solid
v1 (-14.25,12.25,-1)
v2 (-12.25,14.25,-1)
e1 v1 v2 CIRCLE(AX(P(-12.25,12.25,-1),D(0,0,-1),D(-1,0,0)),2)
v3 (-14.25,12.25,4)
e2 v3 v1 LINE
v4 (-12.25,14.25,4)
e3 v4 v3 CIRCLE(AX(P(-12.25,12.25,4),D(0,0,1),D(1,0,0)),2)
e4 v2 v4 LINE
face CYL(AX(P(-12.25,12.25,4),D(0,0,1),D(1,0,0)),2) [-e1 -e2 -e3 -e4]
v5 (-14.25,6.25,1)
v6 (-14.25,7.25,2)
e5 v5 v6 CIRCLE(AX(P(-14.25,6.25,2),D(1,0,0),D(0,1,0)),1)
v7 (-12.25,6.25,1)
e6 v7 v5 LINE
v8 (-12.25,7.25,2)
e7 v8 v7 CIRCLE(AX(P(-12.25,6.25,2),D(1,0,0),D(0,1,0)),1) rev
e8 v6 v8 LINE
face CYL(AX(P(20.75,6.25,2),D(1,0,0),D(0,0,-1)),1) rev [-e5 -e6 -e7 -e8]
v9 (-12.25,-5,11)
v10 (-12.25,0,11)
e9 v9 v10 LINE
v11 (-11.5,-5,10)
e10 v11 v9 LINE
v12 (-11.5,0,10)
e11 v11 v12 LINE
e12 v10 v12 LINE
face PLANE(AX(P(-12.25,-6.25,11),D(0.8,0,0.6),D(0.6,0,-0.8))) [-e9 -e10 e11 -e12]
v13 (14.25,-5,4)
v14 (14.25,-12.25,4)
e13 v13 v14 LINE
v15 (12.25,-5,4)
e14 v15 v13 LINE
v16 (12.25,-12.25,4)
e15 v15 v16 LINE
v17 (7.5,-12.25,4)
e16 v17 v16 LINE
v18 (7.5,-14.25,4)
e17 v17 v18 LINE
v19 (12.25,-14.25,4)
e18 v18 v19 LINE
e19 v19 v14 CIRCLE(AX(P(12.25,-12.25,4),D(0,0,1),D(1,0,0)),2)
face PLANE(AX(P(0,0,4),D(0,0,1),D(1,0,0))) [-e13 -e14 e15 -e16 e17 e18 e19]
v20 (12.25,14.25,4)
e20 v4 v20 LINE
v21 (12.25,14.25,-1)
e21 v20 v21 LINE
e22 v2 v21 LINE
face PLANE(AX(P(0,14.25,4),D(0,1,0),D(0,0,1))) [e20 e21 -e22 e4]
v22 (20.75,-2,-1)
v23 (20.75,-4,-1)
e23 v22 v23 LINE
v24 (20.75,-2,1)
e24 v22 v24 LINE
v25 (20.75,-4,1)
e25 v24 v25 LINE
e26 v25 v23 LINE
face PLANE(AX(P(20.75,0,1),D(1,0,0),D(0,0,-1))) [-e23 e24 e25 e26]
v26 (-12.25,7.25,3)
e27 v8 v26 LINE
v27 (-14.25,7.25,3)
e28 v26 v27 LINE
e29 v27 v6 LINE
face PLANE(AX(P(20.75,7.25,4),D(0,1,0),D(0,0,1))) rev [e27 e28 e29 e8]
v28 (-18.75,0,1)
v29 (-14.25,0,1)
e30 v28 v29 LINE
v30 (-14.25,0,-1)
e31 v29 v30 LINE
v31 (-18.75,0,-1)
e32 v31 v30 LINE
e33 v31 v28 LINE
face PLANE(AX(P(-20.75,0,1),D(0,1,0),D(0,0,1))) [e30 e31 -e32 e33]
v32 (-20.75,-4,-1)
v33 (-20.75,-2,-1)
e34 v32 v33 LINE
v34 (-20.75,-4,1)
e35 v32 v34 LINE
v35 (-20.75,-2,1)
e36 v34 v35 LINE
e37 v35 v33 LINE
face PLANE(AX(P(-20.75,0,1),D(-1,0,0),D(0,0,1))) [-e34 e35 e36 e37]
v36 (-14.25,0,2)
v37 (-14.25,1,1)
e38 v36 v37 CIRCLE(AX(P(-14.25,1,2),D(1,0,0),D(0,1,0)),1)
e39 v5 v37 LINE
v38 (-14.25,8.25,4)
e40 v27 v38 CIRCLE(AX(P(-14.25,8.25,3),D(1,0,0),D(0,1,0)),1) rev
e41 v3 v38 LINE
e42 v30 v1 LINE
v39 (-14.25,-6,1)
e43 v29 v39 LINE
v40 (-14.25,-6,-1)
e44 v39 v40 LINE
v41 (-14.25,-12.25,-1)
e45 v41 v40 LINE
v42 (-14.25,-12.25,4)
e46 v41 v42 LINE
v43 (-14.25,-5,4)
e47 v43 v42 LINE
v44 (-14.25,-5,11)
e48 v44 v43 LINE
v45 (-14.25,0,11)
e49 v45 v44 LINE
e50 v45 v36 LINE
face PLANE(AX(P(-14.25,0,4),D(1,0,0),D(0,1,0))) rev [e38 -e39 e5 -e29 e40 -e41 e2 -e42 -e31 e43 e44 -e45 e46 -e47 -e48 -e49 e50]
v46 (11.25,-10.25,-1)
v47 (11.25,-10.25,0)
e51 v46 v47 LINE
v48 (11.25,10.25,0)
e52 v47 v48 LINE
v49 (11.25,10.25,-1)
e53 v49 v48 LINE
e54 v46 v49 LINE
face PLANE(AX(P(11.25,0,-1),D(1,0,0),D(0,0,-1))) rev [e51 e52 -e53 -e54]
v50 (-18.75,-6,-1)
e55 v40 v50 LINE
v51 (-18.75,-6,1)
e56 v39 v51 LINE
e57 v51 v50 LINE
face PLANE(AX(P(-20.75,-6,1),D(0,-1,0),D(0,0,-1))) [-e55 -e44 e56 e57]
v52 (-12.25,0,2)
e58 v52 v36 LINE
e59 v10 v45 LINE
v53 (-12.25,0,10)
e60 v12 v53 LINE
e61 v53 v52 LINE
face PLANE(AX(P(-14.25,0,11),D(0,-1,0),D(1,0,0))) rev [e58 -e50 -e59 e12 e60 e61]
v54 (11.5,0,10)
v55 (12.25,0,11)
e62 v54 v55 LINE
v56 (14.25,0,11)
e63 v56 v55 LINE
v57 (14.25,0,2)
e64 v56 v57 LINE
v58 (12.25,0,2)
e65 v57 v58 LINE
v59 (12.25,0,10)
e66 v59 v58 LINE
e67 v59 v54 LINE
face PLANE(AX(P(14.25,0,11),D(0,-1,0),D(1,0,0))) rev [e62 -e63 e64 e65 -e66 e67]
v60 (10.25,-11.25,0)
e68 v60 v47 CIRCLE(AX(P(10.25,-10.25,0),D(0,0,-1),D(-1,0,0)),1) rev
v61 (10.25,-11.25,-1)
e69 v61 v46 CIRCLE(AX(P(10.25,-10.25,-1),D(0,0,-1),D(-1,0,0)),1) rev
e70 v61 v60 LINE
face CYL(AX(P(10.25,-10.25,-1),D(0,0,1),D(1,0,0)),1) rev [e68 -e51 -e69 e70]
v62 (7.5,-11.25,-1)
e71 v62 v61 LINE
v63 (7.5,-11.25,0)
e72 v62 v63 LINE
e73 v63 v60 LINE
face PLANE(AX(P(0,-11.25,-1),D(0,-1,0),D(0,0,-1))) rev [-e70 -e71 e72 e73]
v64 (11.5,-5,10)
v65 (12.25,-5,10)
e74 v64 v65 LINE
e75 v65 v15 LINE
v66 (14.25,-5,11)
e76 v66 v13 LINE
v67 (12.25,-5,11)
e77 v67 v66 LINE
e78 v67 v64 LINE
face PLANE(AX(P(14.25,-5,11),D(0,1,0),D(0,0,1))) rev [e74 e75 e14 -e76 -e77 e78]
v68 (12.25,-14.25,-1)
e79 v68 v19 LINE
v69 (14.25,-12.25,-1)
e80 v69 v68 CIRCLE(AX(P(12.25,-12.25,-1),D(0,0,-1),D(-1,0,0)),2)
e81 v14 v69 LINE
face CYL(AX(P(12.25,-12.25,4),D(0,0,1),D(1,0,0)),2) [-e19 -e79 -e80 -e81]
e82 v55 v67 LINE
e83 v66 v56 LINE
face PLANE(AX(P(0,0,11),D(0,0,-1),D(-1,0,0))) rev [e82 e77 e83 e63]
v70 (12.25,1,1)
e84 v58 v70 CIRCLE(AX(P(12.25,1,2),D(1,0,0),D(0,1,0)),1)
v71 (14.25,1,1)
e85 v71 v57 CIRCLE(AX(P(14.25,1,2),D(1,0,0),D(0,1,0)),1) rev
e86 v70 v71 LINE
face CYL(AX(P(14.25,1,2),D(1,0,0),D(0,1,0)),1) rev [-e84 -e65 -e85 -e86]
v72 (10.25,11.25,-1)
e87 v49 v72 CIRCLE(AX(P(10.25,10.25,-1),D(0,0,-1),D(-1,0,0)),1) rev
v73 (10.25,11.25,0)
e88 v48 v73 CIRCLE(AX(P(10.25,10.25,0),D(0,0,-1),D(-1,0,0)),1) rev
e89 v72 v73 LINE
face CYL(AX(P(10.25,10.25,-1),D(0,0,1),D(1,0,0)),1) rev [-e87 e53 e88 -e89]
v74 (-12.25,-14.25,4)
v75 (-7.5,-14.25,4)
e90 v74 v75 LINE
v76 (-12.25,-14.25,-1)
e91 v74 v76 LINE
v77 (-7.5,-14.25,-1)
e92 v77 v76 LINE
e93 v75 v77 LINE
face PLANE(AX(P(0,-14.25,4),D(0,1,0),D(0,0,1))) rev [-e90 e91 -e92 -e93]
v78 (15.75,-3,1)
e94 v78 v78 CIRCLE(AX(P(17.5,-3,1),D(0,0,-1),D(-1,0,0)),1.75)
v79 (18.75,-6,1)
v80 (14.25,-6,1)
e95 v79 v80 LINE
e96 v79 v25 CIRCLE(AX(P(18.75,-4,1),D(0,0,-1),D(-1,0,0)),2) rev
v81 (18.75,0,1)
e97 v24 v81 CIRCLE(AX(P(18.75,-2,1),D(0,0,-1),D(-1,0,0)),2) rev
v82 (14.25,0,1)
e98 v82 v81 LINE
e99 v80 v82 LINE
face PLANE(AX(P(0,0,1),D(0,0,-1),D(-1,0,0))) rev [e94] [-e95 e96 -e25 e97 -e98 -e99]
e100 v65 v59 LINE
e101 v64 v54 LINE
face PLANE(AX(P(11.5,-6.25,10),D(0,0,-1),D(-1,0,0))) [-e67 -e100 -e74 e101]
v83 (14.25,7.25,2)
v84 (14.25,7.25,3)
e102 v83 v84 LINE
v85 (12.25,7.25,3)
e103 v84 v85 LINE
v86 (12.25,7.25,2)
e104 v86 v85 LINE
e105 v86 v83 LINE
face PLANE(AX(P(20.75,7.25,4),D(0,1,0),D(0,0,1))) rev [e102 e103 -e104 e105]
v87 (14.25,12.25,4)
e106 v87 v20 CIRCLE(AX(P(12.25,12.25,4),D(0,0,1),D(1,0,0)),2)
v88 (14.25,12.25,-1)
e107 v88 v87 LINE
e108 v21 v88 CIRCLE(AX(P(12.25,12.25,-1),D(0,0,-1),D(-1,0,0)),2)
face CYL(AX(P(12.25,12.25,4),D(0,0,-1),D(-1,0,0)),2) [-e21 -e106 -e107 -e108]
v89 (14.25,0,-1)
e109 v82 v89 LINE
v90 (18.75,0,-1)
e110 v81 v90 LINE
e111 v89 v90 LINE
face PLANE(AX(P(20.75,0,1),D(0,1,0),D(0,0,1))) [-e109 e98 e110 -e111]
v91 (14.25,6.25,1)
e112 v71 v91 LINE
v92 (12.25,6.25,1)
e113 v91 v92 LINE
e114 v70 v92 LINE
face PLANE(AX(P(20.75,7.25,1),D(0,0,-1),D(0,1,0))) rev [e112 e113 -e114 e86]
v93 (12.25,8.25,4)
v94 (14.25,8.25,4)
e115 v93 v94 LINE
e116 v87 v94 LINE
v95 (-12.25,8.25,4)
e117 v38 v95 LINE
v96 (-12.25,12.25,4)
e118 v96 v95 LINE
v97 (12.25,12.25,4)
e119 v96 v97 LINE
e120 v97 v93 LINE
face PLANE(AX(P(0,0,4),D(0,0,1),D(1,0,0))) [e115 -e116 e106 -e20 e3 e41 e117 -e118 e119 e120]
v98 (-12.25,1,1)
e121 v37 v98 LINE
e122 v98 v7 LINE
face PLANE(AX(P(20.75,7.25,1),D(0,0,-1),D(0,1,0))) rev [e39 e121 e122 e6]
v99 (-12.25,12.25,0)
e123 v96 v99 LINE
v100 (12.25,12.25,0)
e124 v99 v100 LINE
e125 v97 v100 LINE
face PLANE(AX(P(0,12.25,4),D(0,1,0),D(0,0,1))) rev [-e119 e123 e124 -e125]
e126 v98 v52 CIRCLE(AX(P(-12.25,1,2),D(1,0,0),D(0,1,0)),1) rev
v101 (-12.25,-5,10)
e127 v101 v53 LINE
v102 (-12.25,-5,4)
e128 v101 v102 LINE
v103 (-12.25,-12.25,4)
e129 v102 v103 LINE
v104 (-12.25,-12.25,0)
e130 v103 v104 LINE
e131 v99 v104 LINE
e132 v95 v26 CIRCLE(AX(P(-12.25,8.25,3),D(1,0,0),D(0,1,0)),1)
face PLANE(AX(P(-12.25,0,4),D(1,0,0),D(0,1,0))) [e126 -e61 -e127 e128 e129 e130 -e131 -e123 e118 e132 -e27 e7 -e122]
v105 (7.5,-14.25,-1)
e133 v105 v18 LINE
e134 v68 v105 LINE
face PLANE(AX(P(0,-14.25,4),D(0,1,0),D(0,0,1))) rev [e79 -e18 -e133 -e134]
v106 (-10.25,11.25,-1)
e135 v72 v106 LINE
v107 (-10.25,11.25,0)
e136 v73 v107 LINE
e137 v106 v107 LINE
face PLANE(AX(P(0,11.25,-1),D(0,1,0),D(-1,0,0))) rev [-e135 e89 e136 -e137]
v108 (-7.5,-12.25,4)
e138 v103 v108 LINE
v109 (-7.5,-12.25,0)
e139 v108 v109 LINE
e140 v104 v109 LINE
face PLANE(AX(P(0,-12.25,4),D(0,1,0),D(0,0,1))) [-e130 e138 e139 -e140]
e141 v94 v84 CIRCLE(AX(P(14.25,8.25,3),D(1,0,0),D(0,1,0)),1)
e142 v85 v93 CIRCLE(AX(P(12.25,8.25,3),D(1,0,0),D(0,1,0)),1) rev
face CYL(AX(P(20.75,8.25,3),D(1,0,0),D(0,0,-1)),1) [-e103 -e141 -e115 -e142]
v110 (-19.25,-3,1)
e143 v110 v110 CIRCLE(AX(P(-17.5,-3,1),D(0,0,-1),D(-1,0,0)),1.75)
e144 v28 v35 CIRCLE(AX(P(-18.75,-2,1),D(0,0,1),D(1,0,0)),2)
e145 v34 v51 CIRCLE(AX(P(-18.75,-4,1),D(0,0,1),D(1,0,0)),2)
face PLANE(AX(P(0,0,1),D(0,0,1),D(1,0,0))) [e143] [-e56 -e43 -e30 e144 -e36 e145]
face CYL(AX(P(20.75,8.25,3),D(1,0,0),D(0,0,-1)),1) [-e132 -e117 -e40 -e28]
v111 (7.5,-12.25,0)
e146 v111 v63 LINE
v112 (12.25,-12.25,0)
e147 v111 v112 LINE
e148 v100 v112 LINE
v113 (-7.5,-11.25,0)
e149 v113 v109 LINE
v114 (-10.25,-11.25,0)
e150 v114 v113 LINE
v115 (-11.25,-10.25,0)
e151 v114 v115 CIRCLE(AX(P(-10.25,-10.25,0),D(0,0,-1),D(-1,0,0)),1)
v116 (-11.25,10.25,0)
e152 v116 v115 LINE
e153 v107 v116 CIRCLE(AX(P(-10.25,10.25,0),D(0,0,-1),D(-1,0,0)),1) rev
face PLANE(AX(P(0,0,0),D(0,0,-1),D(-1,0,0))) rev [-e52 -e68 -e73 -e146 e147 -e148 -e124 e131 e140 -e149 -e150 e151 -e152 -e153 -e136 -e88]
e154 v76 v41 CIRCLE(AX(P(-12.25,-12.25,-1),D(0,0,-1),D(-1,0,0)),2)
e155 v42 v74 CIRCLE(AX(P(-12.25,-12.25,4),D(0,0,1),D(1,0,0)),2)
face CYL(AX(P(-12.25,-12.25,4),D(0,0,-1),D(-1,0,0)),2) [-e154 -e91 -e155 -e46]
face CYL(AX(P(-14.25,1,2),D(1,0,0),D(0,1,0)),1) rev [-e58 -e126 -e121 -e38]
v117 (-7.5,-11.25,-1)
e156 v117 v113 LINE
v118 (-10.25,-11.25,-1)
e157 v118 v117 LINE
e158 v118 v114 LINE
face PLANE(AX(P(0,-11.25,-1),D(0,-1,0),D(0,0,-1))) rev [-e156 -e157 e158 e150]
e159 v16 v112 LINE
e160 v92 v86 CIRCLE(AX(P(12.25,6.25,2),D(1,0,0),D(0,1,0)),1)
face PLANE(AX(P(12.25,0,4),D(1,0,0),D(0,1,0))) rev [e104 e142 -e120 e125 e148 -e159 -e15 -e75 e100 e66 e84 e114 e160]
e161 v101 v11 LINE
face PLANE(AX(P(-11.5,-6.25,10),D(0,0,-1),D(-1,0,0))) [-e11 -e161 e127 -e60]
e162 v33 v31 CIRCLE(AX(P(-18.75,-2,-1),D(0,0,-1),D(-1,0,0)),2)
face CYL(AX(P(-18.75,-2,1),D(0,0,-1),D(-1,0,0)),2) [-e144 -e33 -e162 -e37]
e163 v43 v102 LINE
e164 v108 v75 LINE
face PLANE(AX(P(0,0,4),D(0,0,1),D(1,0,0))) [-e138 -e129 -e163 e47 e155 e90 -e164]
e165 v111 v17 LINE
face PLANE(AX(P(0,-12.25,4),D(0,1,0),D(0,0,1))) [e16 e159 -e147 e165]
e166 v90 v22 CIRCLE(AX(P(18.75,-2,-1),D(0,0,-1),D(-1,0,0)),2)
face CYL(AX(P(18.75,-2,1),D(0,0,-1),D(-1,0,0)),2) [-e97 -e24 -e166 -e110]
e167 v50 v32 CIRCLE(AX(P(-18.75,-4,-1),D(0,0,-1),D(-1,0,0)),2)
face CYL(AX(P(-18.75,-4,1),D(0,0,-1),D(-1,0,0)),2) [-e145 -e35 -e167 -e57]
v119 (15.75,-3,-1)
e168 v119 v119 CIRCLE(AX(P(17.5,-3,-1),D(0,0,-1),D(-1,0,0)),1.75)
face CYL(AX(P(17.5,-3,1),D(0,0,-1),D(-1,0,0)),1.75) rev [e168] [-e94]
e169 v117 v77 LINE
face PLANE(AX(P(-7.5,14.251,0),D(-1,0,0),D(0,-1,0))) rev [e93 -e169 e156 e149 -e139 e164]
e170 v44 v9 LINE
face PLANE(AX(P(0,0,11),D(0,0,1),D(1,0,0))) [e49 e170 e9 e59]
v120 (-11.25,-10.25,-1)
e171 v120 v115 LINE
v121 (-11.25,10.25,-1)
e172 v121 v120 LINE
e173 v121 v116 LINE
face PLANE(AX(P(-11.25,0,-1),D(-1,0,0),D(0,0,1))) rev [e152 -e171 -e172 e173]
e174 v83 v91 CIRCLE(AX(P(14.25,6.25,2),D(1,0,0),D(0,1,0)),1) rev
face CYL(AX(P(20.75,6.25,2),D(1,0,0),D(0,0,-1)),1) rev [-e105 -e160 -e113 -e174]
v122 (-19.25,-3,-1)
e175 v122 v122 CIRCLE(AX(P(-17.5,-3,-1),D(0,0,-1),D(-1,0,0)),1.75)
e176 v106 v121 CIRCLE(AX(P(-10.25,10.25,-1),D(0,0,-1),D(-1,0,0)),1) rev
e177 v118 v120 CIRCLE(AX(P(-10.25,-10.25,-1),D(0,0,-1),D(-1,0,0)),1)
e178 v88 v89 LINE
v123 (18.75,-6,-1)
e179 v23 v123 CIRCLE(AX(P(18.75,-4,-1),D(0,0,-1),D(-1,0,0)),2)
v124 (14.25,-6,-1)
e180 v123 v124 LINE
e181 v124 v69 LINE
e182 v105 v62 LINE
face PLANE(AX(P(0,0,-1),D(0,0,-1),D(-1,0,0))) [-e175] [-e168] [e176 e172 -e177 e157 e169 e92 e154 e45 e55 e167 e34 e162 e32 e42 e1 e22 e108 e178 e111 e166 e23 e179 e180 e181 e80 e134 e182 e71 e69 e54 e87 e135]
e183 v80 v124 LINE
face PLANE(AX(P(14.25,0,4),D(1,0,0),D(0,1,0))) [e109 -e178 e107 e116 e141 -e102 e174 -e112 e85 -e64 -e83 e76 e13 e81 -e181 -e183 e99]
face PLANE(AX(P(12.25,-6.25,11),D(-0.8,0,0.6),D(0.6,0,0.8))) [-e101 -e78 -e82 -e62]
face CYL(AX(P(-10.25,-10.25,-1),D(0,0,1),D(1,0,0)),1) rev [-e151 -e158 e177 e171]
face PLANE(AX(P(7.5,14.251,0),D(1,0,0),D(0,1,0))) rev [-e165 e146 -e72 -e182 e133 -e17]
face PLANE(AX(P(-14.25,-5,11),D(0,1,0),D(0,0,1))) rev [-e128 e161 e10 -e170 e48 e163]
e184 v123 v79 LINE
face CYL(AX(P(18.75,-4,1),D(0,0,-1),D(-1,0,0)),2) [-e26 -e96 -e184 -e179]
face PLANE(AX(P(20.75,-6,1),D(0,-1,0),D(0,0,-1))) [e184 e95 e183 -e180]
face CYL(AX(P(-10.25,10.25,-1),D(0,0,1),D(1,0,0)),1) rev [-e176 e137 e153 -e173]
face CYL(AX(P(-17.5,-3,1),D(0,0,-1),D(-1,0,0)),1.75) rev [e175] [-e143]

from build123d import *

# Parameters (mm, degrees)
SKETCH_1_W          = 28.5
SKETCH_1_H          = 28.5
SKETCH_1_W_2        = 24.5
SKETCH_1_H_2        = 24.5
EXTRUDE_1_DEPTH     = 4
CUT_EXTRUDE_1_REACH = 34.114
SKETCH_2_W          = 15
SKETCH_2_H          = 4
EXTRUDE_2_DEPTH     = 1
SKETCH_4_W          = 2
SKETCH_4_H          = 5
EXTRUDE_3_DEPTH     = 7
EXTRUDE_7_DEPTH     = 5
SKETCH_6_W          = 6.5
SKETCH_6_H          = 6
SKETCH_6_R          = 1.75
EXTRUDE_6_DEPTH     = 2
FILLET_1_R          = 2
SKETCH_8_W          = 3
SKETCH_8_H          = 7.25
CUT_EXTRUDE_3_DEPTH = 40.358131307
FILLET_2_R          = 1


with BuildPart() as part:
    # ｽｹｯﾁ1 → ﾎﾞｽ - 押し出し1 (new body)
    with BuildSketch(Plane.XY):
        Rectangle(SKETCH_1_W, SKETCH_1_H)
        Rectangle(SKETCH_1_W_2, SKETCH_1_H_2, mode=Mode.SUBTRACT)
    extrude(amount=EXTRUDE_1_DEPTH)

    # ｽｹｯﾁ2 → ｶｯﾄ - 押し出し1 (cut, up to next)
    with BuildSketch(Plane(origin=(0, -14.25, 0), x_dir=(-1, 0, 0), z_dir=(0, -1, 0)), mode=Mode.PRIVATE) as cut_extrude_1_sk1:
        with Locations((0, -2)):
            Rectangle(SKETCH_2_W, SKETCH_2_H)
    cut_extrude_1_tool1 = extrude(cut_extrude_1_sk1.sketch, amount=-CUT_EXTRUDE_1_REACH, mode=Mode.PRIVATE) & part.part
    add(cut_extrude_1_tool1.solids().sort_by_distance((0, -14.25, 2))[0], mode=Mode.SUBTRACT)

    # ｽｹｯﾁ3 → ﾎﾞｽ - 押し出し2 (add)
    with BuildSketch(Plane(origin=(0, 0, 0), x_dir=(-1, 0, 0), z_dir=(0, 0, -1))):
        Polygon((12.25, 12.25), (12.25, -12.25), (7.5, -12.25), (7.5, -14.25), (14.25, -14.25), (14.25, 14.25), (-14.25, 14.25), (-14.25, -14.25), (-7.5, -14.25), (-7.5, -12.25), (-12.25, -12.25), (-12.25, 12.25), align=None)
        with BuildLine():
            Line((12.25, -12.25), (12.25, -10.25))
            ThreePointArc((12.25, -10.25), (11.664213562, -11.664213562), (10.25, -12.25))
            Line((10.25, -12.25), (12.25, -12.25))
        make_face()
        with BuildLine():
            Line((-7.5, -12.25), (-7.5, -11.25))
            Line((-7.5, -11.25), (-10.25, -11.25))
            ThreePointArc((-10.25, -11.25), (-10.957106781, -10.957106781), (-11.25, -10.25))
            Line((-11.25, -10.25), (-11.25, 10.25))
            ThreePointArc((-11.25, 10.25), (-10.957106781, 10.957106781), (-10.25, 11.25))
            Line((-10.25, 11.25), (10.25, 11.25))
            ThreePointArc((10.25, 11.25), (10.957106781, 10.957106781), (11.25, 10.25))
            Line((11.25, 10.25), (11.25, -10.25))
            ThreePointArc((11.25, -10.25), (10.957106781, -10.957106781), (10.25, -11.25))
            Line((10.25, -11.25), (7.5, -11.25))
            Line((7.5, -11.25), (7.5, -12.25))
            Line((7.5, -12.25), (10.25, -12.25))
            ThreePointArc((10.25, -12.25), (11.664213562, -11.664213562), (12.25, -10.25))
            Line((12.25, -10.25), (12.25, 10.25))
            ThreePointArc((12.25, 10.25), (11.664213562, 11.664213562), (10.25, 12.25))
            Line((10.25, 12.25), (-10.25, 12.25))
            ThreePointArc((-10.25, 12.25), (-11.664213562, 11.664213562), (-12.25, 10.25))
            Line((-12.25, 10.25), (-12.25, -10.25))
            ThreePointArc((-12.25, -10.25), (-11.664213562, -11.664213562), (-10.25, -12.25))
            Line((-10.25, -12.25), (-7.5, -12.25))
        make_face()
        with BuildLine():
            Line((-12.25, -12.25), (-10.25, -12.25))
            ThreePointArc((-10.25, -12.25), (-11.664213562, -11.664213562), (-12.25, -10.25))
            Line((-12.25, -10.25), (-12.25, -12.25))
        make_face()
        with BuildLine():
            Line((-12.25, 12.25), (-12.25, 10.25))
            ThreePointArc((-12.25, 10.25), (-11.664213562, 11.664213562), (-10.25, 12.25))
            Line((-10.25, 12.25), (-12.25, 12.25))
        make_face()
        with BuildLine():
            Line((12.25, 12.25), (10.25, 12.25))
            ThreePointArc((10.25, 12.25), (11.664213562, 11.664213562), (12.25, 10.25))
            Line((12.25, 10.25), (12.25, 12.25))
        make_face()
    extrude(amount=EXTRUDE_2_DEPTH)

    # ｽｹｯﾁ4 → ﾎﾞｽ - 押し出し3 (add)
    with BuildSketch(Plane.XY.offset(4)):
        with Locations((13.25, -2.5)):
            Rectangle(SKETCH_4_W, SKETCH_4_H)
        with Locations((-13.25, -2.5)):
            Rectangle(SKETCH_4_W, SKETCH_4_H)
    extrude(amount=EXTRUDE_3_DEPTH)

    # ｽｹｯﾁ5 → ﾎﾞｽ - 押し出し7 (add)
    with BuildSketch(Plane(origin=(0, 0, 0), x_dir=(1, 0, 0), z_dir=(0, 1, 0))):
        Polygon((12.25, -11), (11.5, -10), (12.25, -10), align=None)
        Polygon((-12.25, -11), (-11.5, -10), (-12.25, -10), align=None)
    extrude(amount=-EXTRUDE_7_DEPTH)

    # ｽｹｯﾁ6 → ﾎﾞｽ - 押し出し6 (add)
    # profile 1 of 2: a face of its own
    with BuildSketch(Plane(origin=(0, 0, -1), x_dir=(-1, 0, 0), z_dir=(0, 0, -1))):
        with Locations((17.5, -3)):
            Rectangle(SKETCH_6_W, SKETCH_6_H)
        with Locations((17.5, -3)):
            Circle(SKETCH_6_R, mode=Mode.SUBTRACT)
    # profile 2 of 2: a face of its own
    with BuildSketch(Plane(origin=(0, 0, -1), x_dir=(-1, 0, 0), z_dir=(0, 0, -1))):
        with Locations((-17.5, -3)):
            Rectangle(SKETCH_6_W, SKETCH_6_H)
        with Locations((-17.5, -3)):
            Circle(SKETCH_6_R, mode=Mode.SUBTRACT)
    extrude(amount=-EXTRUDE_6_DEPTH)

    # ﾌｨﾚｯﾄ1
    fillet_1_edges = [part.edges().sort_by_distance(p)[0] for p in [
        (20.75, -6, 0),
        (20.75, 0, 0),
        (-20.75, 0, 0),
        (-20.75, -6, 0),
        (14.25, 14.25, 1.5),
        (14.25, -14.25, 1.5),
        (-14.25, -14.25, 1.5),
        (-14.25, 14.25, 1.5),
    ]]
    fillet(fillet_1_edges, radius=FILLET_1_R)

    # ｽｹｯﾁ8 → ｶｯﾄ - 押し出し3 (cut, through all)
    with BuildSketch(Plane.ZY.offset(14.25)):
        with Locations((2.5, 3.625)):
            Rectangle(SKETCH_8_W, SKETCH_8_H)
    extrude(amount=-CUT_EXTRUDE_3_DEPTH, mode=Mode.SUBTRACT)

    # ﾌｨﾚｯﾄ2
    # the kernel refuses this fillet: 1 mm, written as the material it adds along each edge
    with BuildSketch(Plane(origin=(12.25, 7.25, 1), x_dir=(0, -1, 0), z_dir=(1, 0, 0))) as fillet_2_piece_1:
        with BuildLine():
            CenterArc((FILLET_2_R, -FILLET_2_R), FILLET_2_R, 90, 90)
            Line((0, -FILLET_2_R), (0, 0))
            Line((0, 0), (FILLET_2_R, 0))
        make_face()
    extrude(amount=2)
    with BuildSketch(Plane(origin=(12.25, 0, 1), x_dir=(0, 1, 0), z_dir=(1, 0, 0)), Plane(origin=(-14.25, 0, 1), x_dir=(0, 1, 0), z_dir=(1, 0, 0)), Plane(origin=(-14.25, 7.25, 1), x_dir=(0, 0, 1), z_dir=(1, 0, 0))) as fillet_2_piece_2:
        with BuildLine():
            CenterArc((FILLET_2_R, FILLET_2_R), FILLET_2_R, 180, 90)
            Line((0, FILLET_2_R), (0, 0))
            Line((0, 0), (FILLET_2_R, 0))
        make_face()
    extrude(amount=2)
    # the kernel refuses this fillet: 1 mm, written as the material it takes off along each edge
    with BuildSketch(Plane(origin=(9.75, 7.25, 4), x_dir=(0, 1, 0), z_dir=(1, 0, 0)), Plane(origin=(-16.75, 7.25, 4), x_dir=(0, 1, 0), z_dir=(1, 0, 0))) as fillet_2_2_piece_1:
        with BuildLine():
            CenterArc((FILLET_2_R, -FILLET_2_R), FILLET_2_R, 90, 90)
            Line((0, -FILLET_2_R), (0, 0))
            Line((0, 0), (FILLET_2_R, 0))
        make_face()
    extrude(amount=7, mode=Mode.SUBTRACT)


solid = part.part
